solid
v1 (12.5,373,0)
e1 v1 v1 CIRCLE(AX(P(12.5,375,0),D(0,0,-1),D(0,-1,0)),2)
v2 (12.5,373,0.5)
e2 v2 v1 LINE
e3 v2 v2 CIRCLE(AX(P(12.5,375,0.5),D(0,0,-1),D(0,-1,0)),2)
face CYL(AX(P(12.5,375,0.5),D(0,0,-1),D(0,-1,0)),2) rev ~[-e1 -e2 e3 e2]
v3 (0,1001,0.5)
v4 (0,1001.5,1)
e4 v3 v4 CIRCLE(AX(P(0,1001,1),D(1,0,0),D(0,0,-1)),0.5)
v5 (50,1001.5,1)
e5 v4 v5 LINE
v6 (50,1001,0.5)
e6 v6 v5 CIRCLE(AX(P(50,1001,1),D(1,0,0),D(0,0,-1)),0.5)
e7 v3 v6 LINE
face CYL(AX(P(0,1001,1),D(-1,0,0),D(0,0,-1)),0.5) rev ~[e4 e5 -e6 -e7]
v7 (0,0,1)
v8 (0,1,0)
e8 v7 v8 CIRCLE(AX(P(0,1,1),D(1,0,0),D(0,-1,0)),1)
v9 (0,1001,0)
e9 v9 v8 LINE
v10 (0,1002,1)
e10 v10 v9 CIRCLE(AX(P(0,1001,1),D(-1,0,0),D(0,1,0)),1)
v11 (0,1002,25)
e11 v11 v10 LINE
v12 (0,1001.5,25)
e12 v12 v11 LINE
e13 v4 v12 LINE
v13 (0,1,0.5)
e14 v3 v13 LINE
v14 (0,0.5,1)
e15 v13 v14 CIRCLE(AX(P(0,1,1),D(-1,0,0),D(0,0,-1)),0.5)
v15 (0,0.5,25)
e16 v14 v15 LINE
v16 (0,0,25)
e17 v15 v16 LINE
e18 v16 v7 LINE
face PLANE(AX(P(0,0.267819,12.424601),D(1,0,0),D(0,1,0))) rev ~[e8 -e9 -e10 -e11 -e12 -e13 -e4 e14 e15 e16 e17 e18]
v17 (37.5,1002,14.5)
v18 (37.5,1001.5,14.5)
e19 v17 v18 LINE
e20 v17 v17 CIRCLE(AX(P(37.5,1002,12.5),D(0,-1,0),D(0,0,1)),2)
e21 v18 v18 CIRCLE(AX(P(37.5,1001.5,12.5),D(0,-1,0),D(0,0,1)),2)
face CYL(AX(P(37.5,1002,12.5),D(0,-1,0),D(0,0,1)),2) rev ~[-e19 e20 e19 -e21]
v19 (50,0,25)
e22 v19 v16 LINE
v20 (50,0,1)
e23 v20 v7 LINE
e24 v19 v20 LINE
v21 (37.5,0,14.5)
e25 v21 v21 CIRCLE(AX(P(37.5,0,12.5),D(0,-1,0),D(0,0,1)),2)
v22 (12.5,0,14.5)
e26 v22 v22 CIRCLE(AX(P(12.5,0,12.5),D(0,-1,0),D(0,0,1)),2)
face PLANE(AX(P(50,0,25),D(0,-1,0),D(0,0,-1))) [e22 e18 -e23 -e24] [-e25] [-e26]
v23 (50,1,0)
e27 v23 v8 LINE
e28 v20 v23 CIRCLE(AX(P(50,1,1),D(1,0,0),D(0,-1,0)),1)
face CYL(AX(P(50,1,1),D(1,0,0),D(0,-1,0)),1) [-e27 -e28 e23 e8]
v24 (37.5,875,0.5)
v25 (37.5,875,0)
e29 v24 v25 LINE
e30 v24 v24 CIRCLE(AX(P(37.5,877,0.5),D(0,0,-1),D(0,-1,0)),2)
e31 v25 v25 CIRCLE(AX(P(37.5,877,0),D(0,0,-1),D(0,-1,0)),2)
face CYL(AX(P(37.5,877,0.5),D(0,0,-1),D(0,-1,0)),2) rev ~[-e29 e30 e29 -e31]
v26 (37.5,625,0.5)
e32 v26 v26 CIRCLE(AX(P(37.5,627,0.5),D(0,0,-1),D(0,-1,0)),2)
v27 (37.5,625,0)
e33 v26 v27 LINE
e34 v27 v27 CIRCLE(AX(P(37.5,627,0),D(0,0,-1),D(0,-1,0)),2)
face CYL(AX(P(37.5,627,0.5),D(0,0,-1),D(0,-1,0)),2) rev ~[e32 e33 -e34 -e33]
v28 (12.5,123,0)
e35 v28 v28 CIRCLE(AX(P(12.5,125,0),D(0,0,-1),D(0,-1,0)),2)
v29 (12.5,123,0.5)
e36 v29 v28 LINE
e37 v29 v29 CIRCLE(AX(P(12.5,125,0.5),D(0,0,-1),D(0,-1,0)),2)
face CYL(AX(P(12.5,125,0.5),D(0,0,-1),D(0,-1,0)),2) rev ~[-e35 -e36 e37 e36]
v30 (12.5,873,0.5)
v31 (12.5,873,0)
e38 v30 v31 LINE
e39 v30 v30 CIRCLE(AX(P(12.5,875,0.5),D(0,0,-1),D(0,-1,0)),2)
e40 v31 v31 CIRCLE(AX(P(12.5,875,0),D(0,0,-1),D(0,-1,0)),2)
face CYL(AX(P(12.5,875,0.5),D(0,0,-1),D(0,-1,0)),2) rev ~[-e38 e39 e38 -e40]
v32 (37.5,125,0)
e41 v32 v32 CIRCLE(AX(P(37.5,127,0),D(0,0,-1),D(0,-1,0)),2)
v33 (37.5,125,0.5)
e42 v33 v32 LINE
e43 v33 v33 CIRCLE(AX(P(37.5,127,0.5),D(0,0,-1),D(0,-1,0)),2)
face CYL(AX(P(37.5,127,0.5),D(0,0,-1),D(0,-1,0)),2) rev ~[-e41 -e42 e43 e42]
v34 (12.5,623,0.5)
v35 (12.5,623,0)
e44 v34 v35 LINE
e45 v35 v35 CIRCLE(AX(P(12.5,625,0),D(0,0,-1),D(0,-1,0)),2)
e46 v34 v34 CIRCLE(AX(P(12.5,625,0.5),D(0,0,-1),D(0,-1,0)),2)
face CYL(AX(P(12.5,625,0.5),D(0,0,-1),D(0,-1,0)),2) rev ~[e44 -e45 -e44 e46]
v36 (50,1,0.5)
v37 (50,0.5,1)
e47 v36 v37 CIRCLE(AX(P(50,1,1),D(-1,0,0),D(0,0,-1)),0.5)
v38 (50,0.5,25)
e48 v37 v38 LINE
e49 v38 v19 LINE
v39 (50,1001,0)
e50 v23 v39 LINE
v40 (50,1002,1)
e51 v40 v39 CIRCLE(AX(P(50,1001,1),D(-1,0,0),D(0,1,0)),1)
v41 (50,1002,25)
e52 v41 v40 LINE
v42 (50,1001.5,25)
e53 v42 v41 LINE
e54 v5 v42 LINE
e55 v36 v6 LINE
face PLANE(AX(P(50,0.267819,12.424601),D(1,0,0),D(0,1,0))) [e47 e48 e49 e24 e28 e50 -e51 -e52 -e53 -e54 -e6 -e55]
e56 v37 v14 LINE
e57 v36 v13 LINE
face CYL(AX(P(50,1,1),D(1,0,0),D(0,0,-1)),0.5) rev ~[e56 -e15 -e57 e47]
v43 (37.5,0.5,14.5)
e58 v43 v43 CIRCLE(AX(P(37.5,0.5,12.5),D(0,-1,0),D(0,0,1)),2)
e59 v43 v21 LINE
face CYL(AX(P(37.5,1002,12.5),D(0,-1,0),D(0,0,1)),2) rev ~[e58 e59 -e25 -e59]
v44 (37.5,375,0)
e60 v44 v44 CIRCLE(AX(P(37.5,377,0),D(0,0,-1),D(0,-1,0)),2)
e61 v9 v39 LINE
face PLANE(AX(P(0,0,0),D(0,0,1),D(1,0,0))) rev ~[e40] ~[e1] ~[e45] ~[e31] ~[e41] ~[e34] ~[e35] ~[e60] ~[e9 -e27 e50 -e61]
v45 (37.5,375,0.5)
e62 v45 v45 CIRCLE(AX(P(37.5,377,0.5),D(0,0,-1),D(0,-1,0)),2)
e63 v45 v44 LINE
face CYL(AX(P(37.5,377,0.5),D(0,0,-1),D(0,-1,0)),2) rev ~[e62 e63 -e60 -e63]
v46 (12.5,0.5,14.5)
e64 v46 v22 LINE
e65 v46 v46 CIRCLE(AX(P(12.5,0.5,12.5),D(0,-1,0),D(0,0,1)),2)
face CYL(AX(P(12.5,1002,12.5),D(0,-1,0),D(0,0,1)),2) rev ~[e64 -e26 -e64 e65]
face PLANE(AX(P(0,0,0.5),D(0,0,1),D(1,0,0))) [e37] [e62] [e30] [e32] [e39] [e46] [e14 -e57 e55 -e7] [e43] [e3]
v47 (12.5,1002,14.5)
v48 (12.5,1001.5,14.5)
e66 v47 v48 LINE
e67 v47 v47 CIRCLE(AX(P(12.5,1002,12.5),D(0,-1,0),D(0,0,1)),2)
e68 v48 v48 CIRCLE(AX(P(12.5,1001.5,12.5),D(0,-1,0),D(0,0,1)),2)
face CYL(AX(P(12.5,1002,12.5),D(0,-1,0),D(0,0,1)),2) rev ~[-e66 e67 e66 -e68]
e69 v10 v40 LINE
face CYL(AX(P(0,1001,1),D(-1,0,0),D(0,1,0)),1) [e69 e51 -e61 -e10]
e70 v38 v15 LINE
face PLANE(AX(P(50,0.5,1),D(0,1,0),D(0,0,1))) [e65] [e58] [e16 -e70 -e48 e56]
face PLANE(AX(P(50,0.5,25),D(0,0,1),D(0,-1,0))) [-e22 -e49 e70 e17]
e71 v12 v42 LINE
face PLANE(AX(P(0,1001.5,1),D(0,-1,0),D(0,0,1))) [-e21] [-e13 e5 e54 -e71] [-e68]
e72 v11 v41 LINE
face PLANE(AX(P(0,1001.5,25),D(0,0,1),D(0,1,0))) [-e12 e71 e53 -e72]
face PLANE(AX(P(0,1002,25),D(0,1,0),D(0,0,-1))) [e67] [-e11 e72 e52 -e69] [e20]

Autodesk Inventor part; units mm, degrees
ref_plane "YZ Plane" through (0, 0, 0) normal (1, 0, 0) x (0, 1, 0)
ref_plane "XZ Plane" through (0, 0, 0) normal (0, 1, 0) x (-1, 0, 0)
ref_plane "XY Plane" through (0, 0, 0) normal (0, 0, 1) x (1, 0, 0)
sketch "Sketch1" plane through (0, 0, 0) normal (0, 0, 1) x (1, 0, 0)
  line L0 (0, 0) -> (50, 0)
  line L1 (50, 0) -> (50, 1002)
  line L2 (50, 1002) -> (0, 1002)
  line L3 (0, 1002) -> (0, 0)
  dimension "d0" = 50
  dimension "d1" = 1002
extrude "Plate1" add sketch "Sketch1" along normal blind 0.5
sketch "Sketch2" plane through (0, 0, 0.5) normal (0, 0, 1) x (1, 0, 0)
  circle A0 centre (12.5, 125) radius 2
  line L0 (50, 0) -> (0, 0) projected
  line L1 (0, 0) -> (0, 1002) projected
  circle A1 centre (12.5, 375) radius 2
  circle A2 centre (12.5, 625) radius 2
  circle A3 centre (12.5, 875) radius 2
  circle A4 centre (37.5, 877) radius 2
  line L2 (50, 1002) -> (50, 0) projected
  line L3 (0, 1002) -> (50, 1002) projected
  circle A5 centre (37.5, 627) radius 2
  circle A6 centre (37.5, 377) radius 2
  circle A7 centre (37.5, 127) radius 2
  dimension "d3" = 4
  dimension "d4" = 125
  dimension "d5" = 12.5
  dimension "d6" = 4
  dimension "d7" = 250
  dimension "d8" = 12.5
  dimension "d9" = 4
  dimension "d10" = 250
  dimension "d11" = 12.5
  dimension "d12" = 4
  dimension "d13" = 250
  dimension "d14" = 12.5
  dimension "d15" = 4
  dimension "d16" = 12.5
  dimension "d17" = 125
  dimension "d18" = 4
  dimension "d19" = 250
  dimension "d20" = 12.5
  dimension "d21" = 4
  dimension "d22" = 250
  dimension "d23" = 12.5
  dimension "d24" = 4
  dimension "d25" = 250
  dimension "d26" = 12.5
hole "Hole1" at (12.5, 875, 0.5) at (37.5, 877, 0.5) at (37.5, 627, 0.5) at (12.5, 625, 0.5) at (37.5, 377, 0.5) at (12.5, 375, 0.5) at (37.5, 127, 0.5) at (12.5, 125, 0.5) direction (0, 0, -1) diameter 4 end through all
sketch "Sketch3" plane through (0, 1001.5, 0) normal (0, 1, 0) x (-1, 0, 0)
  line L0 (-50, 0) -> (0, 0)
  line L1 (0, 0) -> (0, 25)
  line L2 (0, 25) -> (-50, 25)
  line L3 (-50, 25) -> (-50, 0)
edge flange "Flange1" height 25 angle 90 thickness 0.5 bend radius 0.5 thickness toward (0, 1, 0) relief tear relief width 0.5 relief depth 0.25 edges at (25, 1002, 0.5) wall of the first edge with corners at (50, 1001.5, 0) (0, 1001.5, 0) (0, 1001.5, 25) (50, 1001.5, 25)
bend "Bend1"
corner "Corner1"
sketch "Sketch4" plane through (50, 0.5, 0) normal (0, -1, 0) x (1, 0, 0)
  line L0 (-50, 0) -> (0, 0)
  line L1 (0, 0) -> (0, 25)
  line L2 (0, 25) -> (-50, 25)
  line L3 (-50, 25) -> (-50, 0)
edge flange "Flange2" height 25 angle 90 thickness 0.5 bend radius 0.5 thickness toward (0, -1, 0) relief tear relief width 0.5 relief depth 0.25 edges at (25, 0, 0.5) wall of the first edge with corners at (0, 0.5, 0) (50, 0.5, 0) (50, 0.5, 25) (0, 0.5, 25)
bend "Bend2"
corner "Corner2"
sketch "Sketch5" plane through (0, 1002, 25) normal (0, 1, 0) x (1, 0, 0)
  circle A0 centre (12.5, 12.5) radius 2
  circle A1 centre (37.5, 12.5) radius 2
  line L0 (0, 0) -> (0, 24) projected
  line L1 (50, 24) -> (50, 0) projected
  line L2 (50, 0) -> (0, 0) projected
  point P0 (0, 25)
  dimension "d54" = 4
  dimension "d55" = 4
  dimension "d56" = 12.5
  dimension "d57" = 12.5
  dimension "d58" = 12.5
  dimension "d59" = 12.5
hole "Hole2" at (12.5, 1002, 12.5) at (37.5, 1002, 12.5) direction (0, -1, 0) diameter 4 end through all
equation "\"d0\" = A_width"
equation "\"d3\" = rivet_diameter"
equation "\"d4\" = 0.5 * rivet_displacement"
equation "\"d5\" = 0.25 * A_width"
equation "\"d6\" = rivet_diameter"
equation "\"d7\" = rivet_displacement"
equation "\"d8\" = 0.25 * A_width"
equation "\"d9\" = rivet_diameter"
equation "\"d10\" = rivet_displacement"
equation "\"d11\" = 0.25 * A_width"
equation "\"d12\" = rivet_diameter"
equation "\"d13\" = rivet_displacement"
equation "\"d14\" = 0.25 * A_width"
equation "\"d15\" = rivet_diameter"
equation "\"d16\" = 0.25 * A_width"
equation "\"d17\" = 0.5 * rivet_displacement"
equation "\"d18\" = rivet_diameter"
equation "\"d19\" = rivet_displacement"
equation "\"d20\" = 0.25 * A_width"
equation "\"d21\" = rivet_diameter"
equation "\"d22\" = rivet_displacement"
equation "\"d23\" = 0.25 * A_width"
equation "\"d24\" = rivet_diameter"
equation "\"d25\" = rivet_displacement"
equation "\"d26\" = 0.25 * A_width"
equation "\"d27\" = rivet_diameter"
equation "\"d32\" = Thickness"
equation "\"d54\" = rivet_diameter"
equation "\"d55\" = rivet_diameter"
equation "\"d56\" = 0.25 * A_width"
equation "\"d57\" = 0.25 * A_width"
equation "\"d58\" = 0.25 * A_width"
equation "\"d59\" = 0.25 * A_width"
equation "\"d60\" = rivet_diameter"
equation "\"d65\" = Thickness"
equation "\"d2\" = Thickness"
equation "\"d34\" = BendReliefWidth"
equation "\"d35\" = BendReliefDepth"
equation "\"d36\" = MinimumRemnant"
equation "\"d37\" = TransitionRadius"
equation "\"d38\" = 0.5 * A_width"
equation "\"d40\" = BendRadius"
equation "\"d41\" = CornerReliefSize"
equation "\"d42\" = GapSize"
equation "\"d43\" = JacobiRadiusSize"
equation "\"d44\" = BendReliefWidth"
equation "\"d45\" = BendReliefDepth"
equation "\"d46\" = MinimumRemnant"
equation "\"d47\" = TransitionRadius"
equation "\"d48\" = 0.5 * A_width"
equation "\"d50\" = BendRadius"
equation "\"d51\" = CornerReliefSize"
equation "\"d52\" = GapSize"
equation "\"d53\" = JacobiRadiusSize"
equation "\"BendRadius\" = Thickness"
equation "\"BendReliefWidth\" = Thickness"
equation "\"BendReliefDepth\" = 0.5 * Thickness"
equation "\"CornerReliefSize\" = 4 * Thickness"
equation "\"MinimumRemnant\" = 2 * Thickness"
equation "\"TransitionRadius\" = BendRadius"
equation "\"JacobiRadiusSize\" = BendRadius"
equation "\"GapSize\" = Thickness"
equation "\"A_width\" = 50"
equation "\"l___________\" = 0"
equation "\"l__________\" = 0"
equation "\"l_________\" = 0"
equation "\"rivet_diameter\" = 4"
equation "\"rivet_displacement\" = 250"
equation "\"l________\" = 0"
equation "\"plate_thickness\" = 2"
equation "\"Thickness\" = 0.5"
properties part number "A1_BeamCoverPlate"
